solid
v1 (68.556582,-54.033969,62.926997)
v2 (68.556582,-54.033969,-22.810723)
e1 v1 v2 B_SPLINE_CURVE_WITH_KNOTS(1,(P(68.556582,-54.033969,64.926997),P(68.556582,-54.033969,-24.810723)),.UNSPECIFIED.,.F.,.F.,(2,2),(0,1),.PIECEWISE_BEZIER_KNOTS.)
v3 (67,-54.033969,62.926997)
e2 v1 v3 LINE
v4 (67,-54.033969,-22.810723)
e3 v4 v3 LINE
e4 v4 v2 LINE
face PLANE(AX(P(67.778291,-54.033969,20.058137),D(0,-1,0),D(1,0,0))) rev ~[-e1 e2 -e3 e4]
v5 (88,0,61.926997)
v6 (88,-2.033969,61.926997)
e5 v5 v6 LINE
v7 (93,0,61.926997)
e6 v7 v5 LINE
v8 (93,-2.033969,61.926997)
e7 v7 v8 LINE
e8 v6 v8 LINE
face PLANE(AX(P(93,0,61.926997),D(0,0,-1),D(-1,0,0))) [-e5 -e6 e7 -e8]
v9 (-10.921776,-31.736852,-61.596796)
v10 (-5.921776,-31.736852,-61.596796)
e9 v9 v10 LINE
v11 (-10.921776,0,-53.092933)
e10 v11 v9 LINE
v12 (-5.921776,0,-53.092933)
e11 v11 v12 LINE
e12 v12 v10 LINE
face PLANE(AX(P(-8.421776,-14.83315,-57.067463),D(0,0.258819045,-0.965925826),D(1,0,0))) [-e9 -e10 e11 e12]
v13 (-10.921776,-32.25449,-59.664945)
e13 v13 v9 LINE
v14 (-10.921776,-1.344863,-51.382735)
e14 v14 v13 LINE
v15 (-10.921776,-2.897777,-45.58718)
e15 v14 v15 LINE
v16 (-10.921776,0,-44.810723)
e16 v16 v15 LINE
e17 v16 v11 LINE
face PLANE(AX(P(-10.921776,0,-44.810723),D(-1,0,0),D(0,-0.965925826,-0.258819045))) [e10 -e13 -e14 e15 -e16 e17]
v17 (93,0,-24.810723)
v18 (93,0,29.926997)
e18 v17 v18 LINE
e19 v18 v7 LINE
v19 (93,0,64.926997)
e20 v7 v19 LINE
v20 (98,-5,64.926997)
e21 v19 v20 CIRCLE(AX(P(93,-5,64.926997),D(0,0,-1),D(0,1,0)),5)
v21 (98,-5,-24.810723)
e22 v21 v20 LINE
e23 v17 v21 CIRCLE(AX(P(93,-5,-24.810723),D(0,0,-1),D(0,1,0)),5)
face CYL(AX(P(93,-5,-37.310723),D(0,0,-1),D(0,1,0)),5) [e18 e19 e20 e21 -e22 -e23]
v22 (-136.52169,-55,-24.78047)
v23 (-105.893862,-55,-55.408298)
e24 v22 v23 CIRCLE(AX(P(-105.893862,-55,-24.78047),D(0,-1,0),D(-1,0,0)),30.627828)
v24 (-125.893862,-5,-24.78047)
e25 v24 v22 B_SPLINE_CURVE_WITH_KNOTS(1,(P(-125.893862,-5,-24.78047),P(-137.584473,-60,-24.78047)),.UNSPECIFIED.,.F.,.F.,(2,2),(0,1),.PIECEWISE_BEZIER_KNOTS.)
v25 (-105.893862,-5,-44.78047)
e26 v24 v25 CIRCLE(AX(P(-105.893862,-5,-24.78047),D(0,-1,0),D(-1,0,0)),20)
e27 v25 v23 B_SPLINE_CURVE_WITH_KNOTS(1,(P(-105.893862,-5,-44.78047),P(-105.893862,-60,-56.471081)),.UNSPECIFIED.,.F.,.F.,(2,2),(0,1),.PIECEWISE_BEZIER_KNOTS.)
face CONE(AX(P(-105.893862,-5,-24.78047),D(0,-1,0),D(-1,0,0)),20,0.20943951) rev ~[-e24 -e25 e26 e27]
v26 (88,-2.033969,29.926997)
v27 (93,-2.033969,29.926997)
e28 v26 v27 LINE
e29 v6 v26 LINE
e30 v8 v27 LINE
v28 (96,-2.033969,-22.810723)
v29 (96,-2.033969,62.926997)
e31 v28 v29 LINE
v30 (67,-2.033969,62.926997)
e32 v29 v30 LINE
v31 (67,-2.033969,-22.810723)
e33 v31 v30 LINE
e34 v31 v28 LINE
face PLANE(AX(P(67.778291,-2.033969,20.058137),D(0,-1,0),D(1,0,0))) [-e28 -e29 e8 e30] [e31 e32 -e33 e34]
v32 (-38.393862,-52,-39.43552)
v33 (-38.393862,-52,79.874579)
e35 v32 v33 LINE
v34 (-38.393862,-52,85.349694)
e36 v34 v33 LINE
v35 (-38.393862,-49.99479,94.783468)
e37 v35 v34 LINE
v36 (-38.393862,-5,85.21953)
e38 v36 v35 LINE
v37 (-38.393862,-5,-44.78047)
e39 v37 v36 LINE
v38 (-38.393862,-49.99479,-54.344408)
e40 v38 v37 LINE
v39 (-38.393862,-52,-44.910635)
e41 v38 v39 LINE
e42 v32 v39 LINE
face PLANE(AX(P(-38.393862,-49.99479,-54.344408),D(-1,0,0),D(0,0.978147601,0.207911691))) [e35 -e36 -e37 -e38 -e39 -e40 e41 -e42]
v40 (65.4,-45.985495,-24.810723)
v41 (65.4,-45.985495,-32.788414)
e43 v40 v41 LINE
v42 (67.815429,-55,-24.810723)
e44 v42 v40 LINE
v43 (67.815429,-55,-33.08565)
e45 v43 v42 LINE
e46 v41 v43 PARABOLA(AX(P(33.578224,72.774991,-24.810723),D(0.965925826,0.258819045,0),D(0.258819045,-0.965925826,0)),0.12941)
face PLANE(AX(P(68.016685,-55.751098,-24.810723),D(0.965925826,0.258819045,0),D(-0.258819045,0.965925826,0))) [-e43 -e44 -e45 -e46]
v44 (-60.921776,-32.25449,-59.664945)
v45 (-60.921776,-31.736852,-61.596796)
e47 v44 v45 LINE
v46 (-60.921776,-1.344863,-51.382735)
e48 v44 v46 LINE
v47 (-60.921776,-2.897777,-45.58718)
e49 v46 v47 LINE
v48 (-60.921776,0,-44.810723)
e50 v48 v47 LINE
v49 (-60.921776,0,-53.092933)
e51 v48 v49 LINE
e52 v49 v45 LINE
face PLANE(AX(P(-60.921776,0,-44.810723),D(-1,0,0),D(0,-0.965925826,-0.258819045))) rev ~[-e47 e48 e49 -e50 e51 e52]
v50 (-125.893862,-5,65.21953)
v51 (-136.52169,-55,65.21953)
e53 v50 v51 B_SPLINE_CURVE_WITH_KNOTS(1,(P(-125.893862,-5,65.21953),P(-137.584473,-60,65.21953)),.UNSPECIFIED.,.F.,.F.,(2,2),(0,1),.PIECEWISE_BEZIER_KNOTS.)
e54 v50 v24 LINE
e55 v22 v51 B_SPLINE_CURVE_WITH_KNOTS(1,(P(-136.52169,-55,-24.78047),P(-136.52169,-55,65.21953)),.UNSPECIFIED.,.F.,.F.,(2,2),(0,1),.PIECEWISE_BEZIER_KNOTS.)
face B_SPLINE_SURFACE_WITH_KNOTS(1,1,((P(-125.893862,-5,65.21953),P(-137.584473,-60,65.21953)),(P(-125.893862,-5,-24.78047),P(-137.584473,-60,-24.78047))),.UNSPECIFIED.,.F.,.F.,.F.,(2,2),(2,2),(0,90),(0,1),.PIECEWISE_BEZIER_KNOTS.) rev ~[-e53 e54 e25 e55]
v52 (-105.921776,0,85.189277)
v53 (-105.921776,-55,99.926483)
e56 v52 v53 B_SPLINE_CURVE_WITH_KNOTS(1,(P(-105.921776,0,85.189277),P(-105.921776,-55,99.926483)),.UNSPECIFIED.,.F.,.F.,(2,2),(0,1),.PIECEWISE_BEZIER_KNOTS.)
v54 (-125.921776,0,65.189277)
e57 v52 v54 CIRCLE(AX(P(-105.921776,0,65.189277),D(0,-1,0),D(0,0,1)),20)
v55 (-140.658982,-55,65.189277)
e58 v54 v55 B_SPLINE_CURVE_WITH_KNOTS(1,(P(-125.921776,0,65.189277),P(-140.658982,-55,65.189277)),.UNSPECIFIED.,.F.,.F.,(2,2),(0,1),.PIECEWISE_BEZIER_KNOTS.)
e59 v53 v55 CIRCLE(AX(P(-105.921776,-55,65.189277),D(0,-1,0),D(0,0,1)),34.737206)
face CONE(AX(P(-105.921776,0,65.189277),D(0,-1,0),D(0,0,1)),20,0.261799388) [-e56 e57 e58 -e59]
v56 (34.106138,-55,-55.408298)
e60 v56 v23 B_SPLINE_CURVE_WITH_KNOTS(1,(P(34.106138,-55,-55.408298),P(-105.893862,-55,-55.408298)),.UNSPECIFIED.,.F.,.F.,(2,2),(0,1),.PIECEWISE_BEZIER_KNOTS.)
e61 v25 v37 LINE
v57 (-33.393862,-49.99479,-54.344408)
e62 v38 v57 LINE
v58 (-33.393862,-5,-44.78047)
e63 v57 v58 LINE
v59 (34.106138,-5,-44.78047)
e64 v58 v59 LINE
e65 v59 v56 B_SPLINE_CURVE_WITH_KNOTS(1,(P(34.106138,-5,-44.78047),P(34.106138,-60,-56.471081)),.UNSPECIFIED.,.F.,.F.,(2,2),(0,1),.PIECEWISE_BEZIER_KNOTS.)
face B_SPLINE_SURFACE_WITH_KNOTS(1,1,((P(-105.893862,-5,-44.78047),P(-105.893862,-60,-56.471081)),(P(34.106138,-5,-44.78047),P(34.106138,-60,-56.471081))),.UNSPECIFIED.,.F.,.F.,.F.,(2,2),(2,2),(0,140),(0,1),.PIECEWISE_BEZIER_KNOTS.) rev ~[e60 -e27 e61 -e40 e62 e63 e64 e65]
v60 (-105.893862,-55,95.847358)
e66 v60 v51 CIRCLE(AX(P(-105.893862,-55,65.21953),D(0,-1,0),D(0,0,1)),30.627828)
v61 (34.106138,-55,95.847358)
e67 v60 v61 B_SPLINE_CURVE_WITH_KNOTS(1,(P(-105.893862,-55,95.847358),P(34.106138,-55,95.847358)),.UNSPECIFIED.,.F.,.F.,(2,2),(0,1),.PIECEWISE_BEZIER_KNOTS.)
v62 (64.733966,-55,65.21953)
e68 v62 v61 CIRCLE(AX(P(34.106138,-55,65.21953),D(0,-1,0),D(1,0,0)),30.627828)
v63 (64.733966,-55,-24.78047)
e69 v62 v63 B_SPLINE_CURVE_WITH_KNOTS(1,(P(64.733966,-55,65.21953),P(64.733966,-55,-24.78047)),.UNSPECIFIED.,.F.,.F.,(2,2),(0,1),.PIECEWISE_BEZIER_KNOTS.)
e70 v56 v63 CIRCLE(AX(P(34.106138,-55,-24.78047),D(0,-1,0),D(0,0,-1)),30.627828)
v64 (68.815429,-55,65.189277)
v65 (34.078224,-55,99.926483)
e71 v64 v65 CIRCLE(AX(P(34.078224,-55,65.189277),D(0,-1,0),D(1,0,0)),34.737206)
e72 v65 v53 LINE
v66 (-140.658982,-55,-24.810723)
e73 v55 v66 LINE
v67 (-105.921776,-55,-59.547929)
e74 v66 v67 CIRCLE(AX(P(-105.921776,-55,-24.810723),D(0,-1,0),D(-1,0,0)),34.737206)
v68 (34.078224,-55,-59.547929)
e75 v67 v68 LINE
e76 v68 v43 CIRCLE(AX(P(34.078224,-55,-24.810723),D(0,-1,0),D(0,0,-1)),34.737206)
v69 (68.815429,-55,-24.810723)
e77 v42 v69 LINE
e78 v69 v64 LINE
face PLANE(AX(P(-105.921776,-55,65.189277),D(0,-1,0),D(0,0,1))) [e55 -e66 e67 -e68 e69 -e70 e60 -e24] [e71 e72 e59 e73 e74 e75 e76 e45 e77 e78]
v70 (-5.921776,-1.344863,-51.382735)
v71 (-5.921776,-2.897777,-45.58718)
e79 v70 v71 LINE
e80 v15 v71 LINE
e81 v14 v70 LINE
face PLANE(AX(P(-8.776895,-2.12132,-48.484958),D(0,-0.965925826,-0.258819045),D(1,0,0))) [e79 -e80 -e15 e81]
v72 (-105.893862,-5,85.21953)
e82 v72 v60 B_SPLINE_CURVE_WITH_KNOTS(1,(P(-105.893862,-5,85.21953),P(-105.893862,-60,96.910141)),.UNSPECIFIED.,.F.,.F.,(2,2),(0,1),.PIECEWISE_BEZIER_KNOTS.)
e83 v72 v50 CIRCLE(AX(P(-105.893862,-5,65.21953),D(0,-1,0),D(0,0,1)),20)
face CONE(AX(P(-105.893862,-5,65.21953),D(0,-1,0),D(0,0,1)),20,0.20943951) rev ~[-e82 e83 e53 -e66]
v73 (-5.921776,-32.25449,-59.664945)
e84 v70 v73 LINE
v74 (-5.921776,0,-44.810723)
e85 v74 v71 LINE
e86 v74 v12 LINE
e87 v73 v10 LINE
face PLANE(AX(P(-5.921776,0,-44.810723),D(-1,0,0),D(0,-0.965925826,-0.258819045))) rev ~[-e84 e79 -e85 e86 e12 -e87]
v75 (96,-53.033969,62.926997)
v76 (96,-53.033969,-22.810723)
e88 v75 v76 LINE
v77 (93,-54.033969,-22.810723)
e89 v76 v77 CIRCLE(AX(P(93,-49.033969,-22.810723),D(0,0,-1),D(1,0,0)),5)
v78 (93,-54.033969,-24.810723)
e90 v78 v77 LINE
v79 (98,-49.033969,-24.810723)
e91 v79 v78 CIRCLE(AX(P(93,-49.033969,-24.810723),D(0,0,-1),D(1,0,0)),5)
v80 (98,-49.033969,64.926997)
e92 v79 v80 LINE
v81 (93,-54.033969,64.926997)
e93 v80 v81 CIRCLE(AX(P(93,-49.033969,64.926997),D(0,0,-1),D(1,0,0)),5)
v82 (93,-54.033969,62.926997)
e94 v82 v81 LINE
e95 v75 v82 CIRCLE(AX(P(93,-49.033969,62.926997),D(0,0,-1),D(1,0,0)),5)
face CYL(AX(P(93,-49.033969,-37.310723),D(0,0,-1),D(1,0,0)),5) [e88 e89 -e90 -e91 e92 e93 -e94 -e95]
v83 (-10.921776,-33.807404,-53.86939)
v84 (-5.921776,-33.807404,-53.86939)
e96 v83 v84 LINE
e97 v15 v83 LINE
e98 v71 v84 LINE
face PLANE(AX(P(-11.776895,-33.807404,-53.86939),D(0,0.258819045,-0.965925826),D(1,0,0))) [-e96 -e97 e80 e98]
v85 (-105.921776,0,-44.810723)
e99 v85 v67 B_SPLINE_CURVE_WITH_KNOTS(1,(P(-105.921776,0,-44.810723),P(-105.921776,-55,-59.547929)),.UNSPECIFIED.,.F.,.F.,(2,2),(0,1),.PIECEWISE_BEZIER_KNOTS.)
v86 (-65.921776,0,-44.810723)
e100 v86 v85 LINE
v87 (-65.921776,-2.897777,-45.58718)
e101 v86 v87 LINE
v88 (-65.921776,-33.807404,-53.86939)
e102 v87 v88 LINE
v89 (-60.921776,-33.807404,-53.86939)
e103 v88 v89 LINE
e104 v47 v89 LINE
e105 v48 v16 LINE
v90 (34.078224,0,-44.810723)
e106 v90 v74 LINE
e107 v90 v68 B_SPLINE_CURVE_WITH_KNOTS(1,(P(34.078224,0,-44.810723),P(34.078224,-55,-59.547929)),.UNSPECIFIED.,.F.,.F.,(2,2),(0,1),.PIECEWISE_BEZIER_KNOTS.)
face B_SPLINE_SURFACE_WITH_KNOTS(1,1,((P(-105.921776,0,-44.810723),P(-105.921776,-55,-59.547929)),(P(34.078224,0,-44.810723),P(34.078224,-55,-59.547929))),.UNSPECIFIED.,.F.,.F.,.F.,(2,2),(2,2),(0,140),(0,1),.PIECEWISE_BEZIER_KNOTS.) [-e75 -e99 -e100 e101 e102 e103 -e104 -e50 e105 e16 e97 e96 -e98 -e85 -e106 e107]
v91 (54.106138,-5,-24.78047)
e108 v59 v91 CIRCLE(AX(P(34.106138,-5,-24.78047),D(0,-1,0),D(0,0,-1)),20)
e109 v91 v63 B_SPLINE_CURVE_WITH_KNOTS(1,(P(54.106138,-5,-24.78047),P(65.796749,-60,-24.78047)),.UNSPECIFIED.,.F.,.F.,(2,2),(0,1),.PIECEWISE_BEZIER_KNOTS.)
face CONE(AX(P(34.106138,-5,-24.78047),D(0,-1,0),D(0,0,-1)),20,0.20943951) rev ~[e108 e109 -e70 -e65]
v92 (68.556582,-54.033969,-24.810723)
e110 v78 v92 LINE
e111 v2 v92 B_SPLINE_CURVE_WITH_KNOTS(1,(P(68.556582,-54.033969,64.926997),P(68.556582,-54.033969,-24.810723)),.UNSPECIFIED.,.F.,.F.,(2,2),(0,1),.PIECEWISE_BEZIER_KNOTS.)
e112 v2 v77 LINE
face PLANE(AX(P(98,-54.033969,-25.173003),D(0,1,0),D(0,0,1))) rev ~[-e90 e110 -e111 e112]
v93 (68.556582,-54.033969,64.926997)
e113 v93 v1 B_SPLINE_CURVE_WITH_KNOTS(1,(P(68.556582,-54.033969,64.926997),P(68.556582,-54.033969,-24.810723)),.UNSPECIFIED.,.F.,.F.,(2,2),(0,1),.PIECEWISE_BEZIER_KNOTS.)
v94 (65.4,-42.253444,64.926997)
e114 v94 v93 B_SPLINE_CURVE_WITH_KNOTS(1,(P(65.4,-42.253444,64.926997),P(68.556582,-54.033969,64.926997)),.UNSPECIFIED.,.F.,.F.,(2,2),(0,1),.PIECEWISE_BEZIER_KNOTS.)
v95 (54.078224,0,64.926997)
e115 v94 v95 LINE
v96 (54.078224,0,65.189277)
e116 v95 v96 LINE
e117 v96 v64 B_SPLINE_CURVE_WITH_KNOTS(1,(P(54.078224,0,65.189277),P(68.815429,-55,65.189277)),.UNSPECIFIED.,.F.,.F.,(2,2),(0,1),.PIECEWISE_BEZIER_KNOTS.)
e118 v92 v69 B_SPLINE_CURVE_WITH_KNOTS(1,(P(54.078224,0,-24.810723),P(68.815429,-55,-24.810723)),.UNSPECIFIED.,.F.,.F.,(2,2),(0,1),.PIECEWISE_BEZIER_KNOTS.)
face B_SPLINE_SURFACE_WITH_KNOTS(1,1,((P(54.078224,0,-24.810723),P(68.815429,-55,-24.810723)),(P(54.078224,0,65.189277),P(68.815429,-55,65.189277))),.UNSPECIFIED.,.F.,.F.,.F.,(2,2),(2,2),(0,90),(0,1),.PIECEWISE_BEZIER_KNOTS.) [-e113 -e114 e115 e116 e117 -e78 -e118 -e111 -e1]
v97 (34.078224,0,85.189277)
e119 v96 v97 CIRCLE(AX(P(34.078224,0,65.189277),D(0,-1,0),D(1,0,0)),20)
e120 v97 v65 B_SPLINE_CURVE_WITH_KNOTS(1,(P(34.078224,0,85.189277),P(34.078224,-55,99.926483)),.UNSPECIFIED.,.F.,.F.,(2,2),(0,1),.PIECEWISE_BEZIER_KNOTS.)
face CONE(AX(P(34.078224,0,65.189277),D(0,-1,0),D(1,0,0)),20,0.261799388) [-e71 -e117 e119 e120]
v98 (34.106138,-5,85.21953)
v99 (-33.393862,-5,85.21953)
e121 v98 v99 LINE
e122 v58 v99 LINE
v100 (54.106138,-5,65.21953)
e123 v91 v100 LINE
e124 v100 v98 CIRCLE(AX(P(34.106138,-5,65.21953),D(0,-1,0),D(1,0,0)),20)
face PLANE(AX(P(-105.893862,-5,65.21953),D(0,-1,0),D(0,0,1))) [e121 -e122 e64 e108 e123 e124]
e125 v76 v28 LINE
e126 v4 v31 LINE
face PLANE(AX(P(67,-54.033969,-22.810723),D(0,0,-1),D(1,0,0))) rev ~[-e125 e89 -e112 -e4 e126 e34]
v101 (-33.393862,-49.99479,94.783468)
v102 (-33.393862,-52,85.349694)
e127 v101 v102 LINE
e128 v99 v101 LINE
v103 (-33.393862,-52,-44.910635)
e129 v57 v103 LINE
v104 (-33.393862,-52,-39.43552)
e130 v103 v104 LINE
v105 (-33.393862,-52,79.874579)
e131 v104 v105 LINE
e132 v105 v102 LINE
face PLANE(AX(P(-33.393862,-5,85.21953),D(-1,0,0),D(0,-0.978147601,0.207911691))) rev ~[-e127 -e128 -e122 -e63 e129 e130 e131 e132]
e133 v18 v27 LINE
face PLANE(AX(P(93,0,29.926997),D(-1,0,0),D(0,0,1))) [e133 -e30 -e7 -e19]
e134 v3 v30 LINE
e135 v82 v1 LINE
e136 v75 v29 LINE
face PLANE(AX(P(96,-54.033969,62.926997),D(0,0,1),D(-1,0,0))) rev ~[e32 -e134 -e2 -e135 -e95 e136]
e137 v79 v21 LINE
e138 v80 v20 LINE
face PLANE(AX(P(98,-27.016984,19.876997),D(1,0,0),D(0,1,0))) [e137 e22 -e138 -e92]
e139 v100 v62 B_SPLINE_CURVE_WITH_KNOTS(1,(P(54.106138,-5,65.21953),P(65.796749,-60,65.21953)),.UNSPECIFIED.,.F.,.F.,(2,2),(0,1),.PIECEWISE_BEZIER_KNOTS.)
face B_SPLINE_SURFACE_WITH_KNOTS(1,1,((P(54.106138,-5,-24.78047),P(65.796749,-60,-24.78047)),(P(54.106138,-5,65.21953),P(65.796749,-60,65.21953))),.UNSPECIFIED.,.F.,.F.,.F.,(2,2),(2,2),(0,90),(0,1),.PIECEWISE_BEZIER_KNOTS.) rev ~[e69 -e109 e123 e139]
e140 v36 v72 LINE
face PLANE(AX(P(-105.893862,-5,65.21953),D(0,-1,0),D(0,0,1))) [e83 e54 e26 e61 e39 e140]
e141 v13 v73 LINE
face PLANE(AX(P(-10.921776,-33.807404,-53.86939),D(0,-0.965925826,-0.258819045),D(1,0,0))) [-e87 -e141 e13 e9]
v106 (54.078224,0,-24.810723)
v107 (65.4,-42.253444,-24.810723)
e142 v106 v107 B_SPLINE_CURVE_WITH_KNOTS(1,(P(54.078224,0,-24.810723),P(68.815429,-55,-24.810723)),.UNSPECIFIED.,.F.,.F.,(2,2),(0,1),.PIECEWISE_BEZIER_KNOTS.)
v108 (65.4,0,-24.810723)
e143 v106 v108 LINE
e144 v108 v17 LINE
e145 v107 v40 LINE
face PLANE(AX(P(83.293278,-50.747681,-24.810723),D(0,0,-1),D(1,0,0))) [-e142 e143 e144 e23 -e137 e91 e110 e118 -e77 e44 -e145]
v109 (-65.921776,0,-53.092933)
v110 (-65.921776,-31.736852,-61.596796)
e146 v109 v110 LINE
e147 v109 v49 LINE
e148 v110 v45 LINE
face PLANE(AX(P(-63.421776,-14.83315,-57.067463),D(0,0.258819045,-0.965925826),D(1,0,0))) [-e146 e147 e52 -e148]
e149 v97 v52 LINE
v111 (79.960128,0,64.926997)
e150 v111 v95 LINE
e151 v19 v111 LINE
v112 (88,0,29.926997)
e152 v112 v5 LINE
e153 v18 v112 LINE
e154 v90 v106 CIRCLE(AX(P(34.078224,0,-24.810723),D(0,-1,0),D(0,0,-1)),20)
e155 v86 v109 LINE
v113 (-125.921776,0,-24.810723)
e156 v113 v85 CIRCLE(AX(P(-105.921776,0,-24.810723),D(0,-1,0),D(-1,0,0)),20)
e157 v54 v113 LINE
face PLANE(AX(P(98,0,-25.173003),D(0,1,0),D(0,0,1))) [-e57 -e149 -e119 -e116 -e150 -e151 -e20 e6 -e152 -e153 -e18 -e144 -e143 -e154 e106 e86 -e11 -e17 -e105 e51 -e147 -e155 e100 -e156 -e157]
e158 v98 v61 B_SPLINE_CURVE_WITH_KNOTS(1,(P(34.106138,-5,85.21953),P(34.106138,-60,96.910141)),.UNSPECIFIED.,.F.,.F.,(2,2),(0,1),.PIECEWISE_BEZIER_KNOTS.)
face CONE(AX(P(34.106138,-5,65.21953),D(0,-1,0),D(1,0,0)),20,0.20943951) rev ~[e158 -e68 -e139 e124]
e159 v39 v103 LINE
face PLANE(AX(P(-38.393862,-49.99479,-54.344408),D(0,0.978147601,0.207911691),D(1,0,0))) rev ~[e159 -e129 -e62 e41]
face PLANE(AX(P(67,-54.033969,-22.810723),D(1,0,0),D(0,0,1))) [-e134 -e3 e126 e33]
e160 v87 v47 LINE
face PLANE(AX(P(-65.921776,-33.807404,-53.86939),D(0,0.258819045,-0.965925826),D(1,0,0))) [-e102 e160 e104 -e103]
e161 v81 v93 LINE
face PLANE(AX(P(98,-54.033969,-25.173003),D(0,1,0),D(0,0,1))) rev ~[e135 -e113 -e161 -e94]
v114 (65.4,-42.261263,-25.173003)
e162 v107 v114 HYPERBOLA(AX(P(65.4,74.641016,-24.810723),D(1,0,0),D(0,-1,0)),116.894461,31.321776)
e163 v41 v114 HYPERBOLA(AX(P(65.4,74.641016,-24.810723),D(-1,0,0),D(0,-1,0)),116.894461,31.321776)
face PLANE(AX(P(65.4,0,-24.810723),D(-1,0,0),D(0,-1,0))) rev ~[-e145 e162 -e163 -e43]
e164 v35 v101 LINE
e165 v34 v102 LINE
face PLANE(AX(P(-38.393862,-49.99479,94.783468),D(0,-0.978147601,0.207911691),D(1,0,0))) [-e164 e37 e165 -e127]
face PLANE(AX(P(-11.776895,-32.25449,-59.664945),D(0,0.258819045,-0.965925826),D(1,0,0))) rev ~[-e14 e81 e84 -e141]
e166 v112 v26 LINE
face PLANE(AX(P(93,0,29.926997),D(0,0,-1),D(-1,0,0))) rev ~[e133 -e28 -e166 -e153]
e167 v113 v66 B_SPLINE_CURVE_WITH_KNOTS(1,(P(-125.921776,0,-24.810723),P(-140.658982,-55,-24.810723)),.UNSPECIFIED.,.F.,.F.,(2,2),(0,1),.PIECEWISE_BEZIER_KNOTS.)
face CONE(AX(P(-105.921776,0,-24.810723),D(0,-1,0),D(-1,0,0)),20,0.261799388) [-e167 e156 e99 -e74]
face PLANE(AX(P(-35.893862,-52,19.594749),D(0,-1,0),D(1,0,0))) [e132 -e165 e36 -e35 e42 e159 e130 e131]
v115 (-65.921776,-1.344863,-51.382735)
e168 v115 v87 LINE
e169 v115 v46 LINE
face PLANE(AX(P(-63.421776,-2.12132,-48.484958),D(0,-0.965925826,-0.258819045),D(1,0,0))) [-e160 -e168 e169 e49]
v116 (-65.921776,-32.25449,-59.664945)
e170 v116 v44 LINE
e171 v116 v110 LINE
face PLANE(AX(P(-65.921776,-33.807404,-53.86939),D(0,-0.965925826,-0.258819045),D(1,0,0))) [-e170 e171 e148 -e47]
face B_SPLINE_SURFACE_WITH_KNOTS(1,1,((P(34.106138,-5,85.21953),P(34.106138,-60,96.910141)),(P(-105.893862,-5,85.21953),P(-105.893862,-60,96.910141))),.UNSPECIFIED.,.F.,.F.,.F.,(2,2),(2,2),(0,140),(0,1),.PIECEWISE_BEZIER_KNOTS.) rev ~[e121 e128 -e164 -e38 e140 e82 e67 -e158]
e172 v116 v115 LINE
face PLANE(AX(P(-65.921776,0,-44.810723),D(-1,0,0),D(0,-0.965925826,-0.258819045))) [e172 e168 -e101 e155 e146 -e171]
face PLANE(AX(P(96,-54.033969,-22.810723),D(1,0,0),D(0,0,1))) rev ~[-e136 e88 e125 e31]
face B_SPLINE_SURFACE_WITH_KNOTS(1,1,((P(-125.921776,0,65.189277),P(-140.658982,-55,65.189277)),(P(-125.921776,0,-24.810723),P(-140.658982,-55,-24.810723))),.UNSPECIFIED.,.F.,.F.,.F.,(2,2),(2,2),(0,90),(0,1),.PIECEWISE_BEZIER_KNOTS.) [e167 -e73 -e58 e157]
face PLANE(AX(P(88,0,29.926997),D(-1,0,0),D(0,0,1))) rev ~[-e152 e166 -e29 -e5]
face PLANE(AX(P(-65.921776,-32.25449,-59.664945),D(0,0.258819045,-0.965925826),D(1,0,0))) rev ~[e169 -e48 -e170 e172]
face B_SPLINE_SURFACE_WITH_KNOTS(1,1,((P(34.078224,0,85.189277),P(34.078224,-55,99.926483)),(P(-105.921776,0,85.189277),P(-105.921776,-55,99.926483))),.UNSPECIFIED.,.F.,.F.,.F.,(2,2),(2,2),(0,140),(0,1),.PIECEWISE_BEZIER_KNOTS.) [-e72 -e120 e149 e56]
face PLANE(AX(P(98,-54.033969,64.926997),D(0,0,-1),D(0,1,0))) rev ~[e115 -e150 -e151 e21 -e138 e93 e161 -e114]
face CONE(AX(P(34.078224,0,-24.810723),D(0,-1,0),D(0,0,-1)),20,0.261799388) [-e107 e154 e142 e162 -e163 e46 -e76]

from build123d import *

# Parameters (mm, degrees)
F1_DEPTH     = 55
F1_TAPER     = -15
F4_DEPTH     = 55
F4_TAPER     = -12
F5_W         = 5
F5_H         = 130
F6_DEPTH     = 47
F10_W        = 360.01701653
F10_H        = 225.87454319
F11_DEPTH    = 25
F12_W        = 5
F12_H        = 46
F13_DEPTH    = 15
F14_W        = 5
F14_H        = 46
F15_DEPTH    = 15
F8_W         = 54.0339685977
F8_H         = 90.1
F16_DEPTH    = 32.6
F9_W         = 55.9400806222
F9_H         = 89.7377200425
F17_DEPTH    = 25
F18_W        = 347.7291613817
F18_H        = 217.2330617905
F19_DEPTH    = 25
F20_W        = 34.4053636551
F20_H        = 45.9854951713
F21_DEPTH    = 25
F22_W        = 1.5565819549
F22_H        = 85.7377200425
F22_W_2      = 27.4434180451
F23_DEPTH    = 52
F24_T1_DEPTH = 114.7377200425
F26_DEPTH    = 25
F27_W        = 5
F27_H        = 32
F28_DEPTH    = 10
F29_W        = 5
F29_H        = 35
F30_DEPTH    = 8
F31_W        = 122.5292943418
F31_H        = 48.8124843687
F32_DEPTH    = 25
F33_W        = 5
F33_H        = 6
F33_W_2      = 6
F34_DEPTH    = 32


# Not quite as in the source:
# - a fillet or chamfer that OpenCascade refuses, or shapes differently, is made with other operations: its cross-section is extruded or revolved along the edge and cut away or added
# - ends of sketch curves that miss each other by under 0.0002 mm in the source are joined


with BuildPart() as f1:
    # F0 (on Front) → F1 (new body)
    with BuildSketch(Plane.XZ):
        with BuildLine():
            Line((34.0782237053, 85.1892769337), (-105.9217762947, 85.1892769337))
            ThreePointArc((-105.9217762947, 85.1892769337), (-120.0639119184, 79.3314125574), (-125.9217762947, 65.1892769337))
            Line((-125.9217762947, 65.1892769337), (-125.9217762947, -24.8107230663))
            ThreePointArc((-125.9217762947, -24.8107230663), (-120.0639119184, -38.9528586901), (-105.9217762947, -44.8107230663))
            Line((-105.9217762947, -44.8107230663), (34.0782237053, -44.8107230663))
            ThreePointArc((34.0782237053, -44.8107230663), (48.220359329, -38.9528586901), (54.0782237053, -24.8107230663))
            Line((54.0782237053, -24.8107230663), (54.0782237053, 65.1892769337))
            ThreePointArc((54.0782237053, 65.1892769337), (48.220359329, 79.3314125574), (34.0782237053, 85.1892769337))
        make_face()
    extrude(amount=F1_DEPTH, taper=F1_TAPER)

    # F3 (on offset) → F4 (cut)
    with BuildSketch(Plane.XZ.offset(5)):
        with BuildLine():
            Line((34.106137666, 85.2195297501), (-105.893862334, 85.2195297501))
            ThreePointArc((-105.893862334, 85.2195297501), (-120.0359979577, 79.3616653739), (-125.893862334, 65.2195297501))
            Line((-125.893862334, 65.2195297501), (-125.893862334, -24.7804702499))
            ThreePointArc((-125.893862334, -24.7804702499), (-120.0359979577, -38.9226058736), (-105.893862334, -44.7804702499))
            Line((-105.893862334, -44.7804702499), (34.106137666, -44.7804702499))
            ThreePointArc((34.106137666, -44.7804702499), (48.2482732898, -38.9226058736), (54.106137666, -24.7804702499))
            Line((54.106137666, -24.7804702499), (54.106137666, 65.2195297501))
            ThreePointArc((54.106137666, 65.2195297501), (48.2482732898, 79.3616653739), (34.106137666, 85.2195297501))
        make_face()
    extrude(amount=F4_DEPTH, taper=F4_TAPER, mode=Mode.SUBTRACT)

    # F5 (on face) → F6 (join)
    with BuildSketch(Plane.XZ.offset(5)):
        with Locations((-35.893862334, 20.2195297501)):
            Rectangle(F5_W, F5_H)
    extrude(amount=F6_DEPTH)

    # F10 (on Front) → F11 (cut)
    with BuildSketch(Plane.XZ):
        with Locations((5.3876563907, 10.9746605158)):
            Rectangle(F10_W, F10_H)
    extrude(amount=-F11_DEPTH, mode=Mode.SUBTRACT)

    # F12 (on face) → F13 (join)
    with BuildSketch(Plane(origin=(0, 8.8907927165, -41.8278911112), x_dir=(1, 0, 0), z_dir=(0, -0.2079116908, 0.9781476007))):
        with Locations((-35.893862334, -37.2011212889)):
            Rectangle(F12_W, F12_H)
    extrude(amount=F13_DEPTH)

    # F14 (on face) → F15 (join)
    with BuildSketch(Plane(origin=(0, 17.1148163716, 80.5188804202), x_dir=(1, 0, 0), z_dir=(0, -0.2079116908, -0.9781476007))):
        with Locations((-35.893862334, 45.6088745247)):
            Rectangle(F14_W, F14_H)
    extrude(amount=F15_DEPTH)

    # F8 (on offset) → F16 (join)
    with BuildSketch(Plane.YZ.offset(98)):
        with Locations((-27.0169842988, 19.8769969761)):
            Rectangle(F8_W, F8_H)
    extrude(amount=-F16_DEPTH)

    # F9 (on face) → F17 (join)
    with BuildSketch(Plane(origin=(50.4556696128, 13.5195559263, 0), x_dir=(-0.2588190451, 0.9659258263, 0), z_dir=(0.9659258263, 0.2588190451, 0))):
        with Locations((-41.9665145313, 20.0581369549)):
            Rectangle(F9_W, F9_H)
    extrude(amount=F17_DEPTH)

    # F18 (on Front) → F19 (cut)
    with BuildSketch(Plane.XZ):
        with Locations((0.111065805, 20.1892703772)):
            Rectangle(F18_W, F18_H)
    extrude(amount=-F19_DEPTH, mode=Mode.SUBTRACT)

    # F20 (on face) → F21 (cut)
    with BuildSketch(Plane(origin=(0, 0, -24.8107230663), x_dir=(1, 0, 0), z_dir=(0, 0, -1))):
        Polygon((68.0166854944, 55.7510983837), (65.4, 45.9854951713), (99.8053636551, 45.9854951713), (100.283839941, 55.7510983837), align=None)
        with Locations((82.6026818275, 22.9927475857)):
            Rectangle(F20_W, F20_H)
    extrude(amount=F21_DEPTH, mode=Mode.SUBTRACT)

    # F22 (on face) → F23 (cut)
    with BuildSketch(Plane.XZ.offset(54.0339685977)):
        with Locations((67.7782909774, 20.0581369549)):
            Rectangle(F22_W, F22_H)
        with Locations((82.2782909774, 20.0581369549)):
            Rectangle(F22_W_2, F22_H)
    extrude(amount=-F23_DEPTH, mode=Mode.SUBTRACT)

    # F24: fillet of radius 5 on 2 edges, made by hand

    # F24_s2 → F24_t1 (cut)
    with BuildSketch(Plane.XY.offset(-37.3107230663)):
        with BuildLine():
            ThreePointArc((98, -49.0339685977), (96.5355339059, -52.5695025036), (93, -54.0339685977))
            Line((93, -54.0339685977), (98, -54.0339685977))
            Line((98, -54.0339685977), (98, -49.0339685977))
        make_face()
        with BuildLine():
            ThreePointArc((93, 0), (96.5355339059, -1.4644660941), (98, -5))
            Line((98, -5), (98, 0))
            Line((98, 0), (93, 0))
        make_face()
    extrude(amount=F24_T1_DEPTH, mode=Mode.SUBTRACT)

    # F25 (on face) → F26 (cut)
    with BuildSketch(Plane.XZ.offset(52)):
        Polygon((-33.3938625455, 92.2565162182), (-38.3938625455, 92.2565162182), (-38.3938625455, -53.0670173466), (-33.393862334, -53.0670173466), align=None)
    extrude(amount=F26_DEPTH, mode=Mode.SUBTRACT)

    # F27 (on face) → F28 (cut)
    with BuildSketch(Plane(origin=(0, 0, 0), x_dir=(-1, 0, 0), z_dir=(0, 1, 0))):
        with Locations((-90.5, 45.9269969761)):
            Rectangle(F27_W, F27_H)
    extrude(amount=-F28_DEPTH, mode=Mode.SUBTRACT)

    # F29 (on face) → F30 (join)
    with BuildSketch(Plane(origin=(0, 11.2026807666, -41.8089738019), x_dir=(1, 0, 0), z_dir=(0, 0.2588190451, -0.9659258263))):
        with Locations((-63.4217762947, 29.0978685544)):
            Rectangle(F29_W, F29_H)
        with Locations((-8.4217762947, 29.0978685544)):
            Rectangle(F29_W, F29_H)
    extrude(amount=F30_DEPTH)

    # F31 (on face) → F32 (cut)
    with BuildSketch(Plane(origin=(0, 0, 0), x_dir=(-1, 0, 0), z_dir=(0, 1, 0))):
        with Locations((32.052250579, -48.6711980775)):
            Rectangle(F31_W, F31_H)
    extrude(amount=F32_DEPTH, mode=Mode.SUBTRACT)

    # F33 (on face) → F34 (cut)
    with BuildSketch(Plane(origin=(0, -45.0100846867, -12.0604158431), x_dir=(1, 0, 0), z_dir=(0, -0.9659258263, -0.2588190451))):
        with Locations((-63.4217762947, -46.2838347045)):
            Rectangle(F33_W, F33_H)
        with Locations((-8.7768949285, -46.2838347045)):
            Rectangle(F33_W_2, F33_H)
    extrude(amount=-F34_DEPTH, mode=Mode.SUBTRACT)


solid = f1.part
